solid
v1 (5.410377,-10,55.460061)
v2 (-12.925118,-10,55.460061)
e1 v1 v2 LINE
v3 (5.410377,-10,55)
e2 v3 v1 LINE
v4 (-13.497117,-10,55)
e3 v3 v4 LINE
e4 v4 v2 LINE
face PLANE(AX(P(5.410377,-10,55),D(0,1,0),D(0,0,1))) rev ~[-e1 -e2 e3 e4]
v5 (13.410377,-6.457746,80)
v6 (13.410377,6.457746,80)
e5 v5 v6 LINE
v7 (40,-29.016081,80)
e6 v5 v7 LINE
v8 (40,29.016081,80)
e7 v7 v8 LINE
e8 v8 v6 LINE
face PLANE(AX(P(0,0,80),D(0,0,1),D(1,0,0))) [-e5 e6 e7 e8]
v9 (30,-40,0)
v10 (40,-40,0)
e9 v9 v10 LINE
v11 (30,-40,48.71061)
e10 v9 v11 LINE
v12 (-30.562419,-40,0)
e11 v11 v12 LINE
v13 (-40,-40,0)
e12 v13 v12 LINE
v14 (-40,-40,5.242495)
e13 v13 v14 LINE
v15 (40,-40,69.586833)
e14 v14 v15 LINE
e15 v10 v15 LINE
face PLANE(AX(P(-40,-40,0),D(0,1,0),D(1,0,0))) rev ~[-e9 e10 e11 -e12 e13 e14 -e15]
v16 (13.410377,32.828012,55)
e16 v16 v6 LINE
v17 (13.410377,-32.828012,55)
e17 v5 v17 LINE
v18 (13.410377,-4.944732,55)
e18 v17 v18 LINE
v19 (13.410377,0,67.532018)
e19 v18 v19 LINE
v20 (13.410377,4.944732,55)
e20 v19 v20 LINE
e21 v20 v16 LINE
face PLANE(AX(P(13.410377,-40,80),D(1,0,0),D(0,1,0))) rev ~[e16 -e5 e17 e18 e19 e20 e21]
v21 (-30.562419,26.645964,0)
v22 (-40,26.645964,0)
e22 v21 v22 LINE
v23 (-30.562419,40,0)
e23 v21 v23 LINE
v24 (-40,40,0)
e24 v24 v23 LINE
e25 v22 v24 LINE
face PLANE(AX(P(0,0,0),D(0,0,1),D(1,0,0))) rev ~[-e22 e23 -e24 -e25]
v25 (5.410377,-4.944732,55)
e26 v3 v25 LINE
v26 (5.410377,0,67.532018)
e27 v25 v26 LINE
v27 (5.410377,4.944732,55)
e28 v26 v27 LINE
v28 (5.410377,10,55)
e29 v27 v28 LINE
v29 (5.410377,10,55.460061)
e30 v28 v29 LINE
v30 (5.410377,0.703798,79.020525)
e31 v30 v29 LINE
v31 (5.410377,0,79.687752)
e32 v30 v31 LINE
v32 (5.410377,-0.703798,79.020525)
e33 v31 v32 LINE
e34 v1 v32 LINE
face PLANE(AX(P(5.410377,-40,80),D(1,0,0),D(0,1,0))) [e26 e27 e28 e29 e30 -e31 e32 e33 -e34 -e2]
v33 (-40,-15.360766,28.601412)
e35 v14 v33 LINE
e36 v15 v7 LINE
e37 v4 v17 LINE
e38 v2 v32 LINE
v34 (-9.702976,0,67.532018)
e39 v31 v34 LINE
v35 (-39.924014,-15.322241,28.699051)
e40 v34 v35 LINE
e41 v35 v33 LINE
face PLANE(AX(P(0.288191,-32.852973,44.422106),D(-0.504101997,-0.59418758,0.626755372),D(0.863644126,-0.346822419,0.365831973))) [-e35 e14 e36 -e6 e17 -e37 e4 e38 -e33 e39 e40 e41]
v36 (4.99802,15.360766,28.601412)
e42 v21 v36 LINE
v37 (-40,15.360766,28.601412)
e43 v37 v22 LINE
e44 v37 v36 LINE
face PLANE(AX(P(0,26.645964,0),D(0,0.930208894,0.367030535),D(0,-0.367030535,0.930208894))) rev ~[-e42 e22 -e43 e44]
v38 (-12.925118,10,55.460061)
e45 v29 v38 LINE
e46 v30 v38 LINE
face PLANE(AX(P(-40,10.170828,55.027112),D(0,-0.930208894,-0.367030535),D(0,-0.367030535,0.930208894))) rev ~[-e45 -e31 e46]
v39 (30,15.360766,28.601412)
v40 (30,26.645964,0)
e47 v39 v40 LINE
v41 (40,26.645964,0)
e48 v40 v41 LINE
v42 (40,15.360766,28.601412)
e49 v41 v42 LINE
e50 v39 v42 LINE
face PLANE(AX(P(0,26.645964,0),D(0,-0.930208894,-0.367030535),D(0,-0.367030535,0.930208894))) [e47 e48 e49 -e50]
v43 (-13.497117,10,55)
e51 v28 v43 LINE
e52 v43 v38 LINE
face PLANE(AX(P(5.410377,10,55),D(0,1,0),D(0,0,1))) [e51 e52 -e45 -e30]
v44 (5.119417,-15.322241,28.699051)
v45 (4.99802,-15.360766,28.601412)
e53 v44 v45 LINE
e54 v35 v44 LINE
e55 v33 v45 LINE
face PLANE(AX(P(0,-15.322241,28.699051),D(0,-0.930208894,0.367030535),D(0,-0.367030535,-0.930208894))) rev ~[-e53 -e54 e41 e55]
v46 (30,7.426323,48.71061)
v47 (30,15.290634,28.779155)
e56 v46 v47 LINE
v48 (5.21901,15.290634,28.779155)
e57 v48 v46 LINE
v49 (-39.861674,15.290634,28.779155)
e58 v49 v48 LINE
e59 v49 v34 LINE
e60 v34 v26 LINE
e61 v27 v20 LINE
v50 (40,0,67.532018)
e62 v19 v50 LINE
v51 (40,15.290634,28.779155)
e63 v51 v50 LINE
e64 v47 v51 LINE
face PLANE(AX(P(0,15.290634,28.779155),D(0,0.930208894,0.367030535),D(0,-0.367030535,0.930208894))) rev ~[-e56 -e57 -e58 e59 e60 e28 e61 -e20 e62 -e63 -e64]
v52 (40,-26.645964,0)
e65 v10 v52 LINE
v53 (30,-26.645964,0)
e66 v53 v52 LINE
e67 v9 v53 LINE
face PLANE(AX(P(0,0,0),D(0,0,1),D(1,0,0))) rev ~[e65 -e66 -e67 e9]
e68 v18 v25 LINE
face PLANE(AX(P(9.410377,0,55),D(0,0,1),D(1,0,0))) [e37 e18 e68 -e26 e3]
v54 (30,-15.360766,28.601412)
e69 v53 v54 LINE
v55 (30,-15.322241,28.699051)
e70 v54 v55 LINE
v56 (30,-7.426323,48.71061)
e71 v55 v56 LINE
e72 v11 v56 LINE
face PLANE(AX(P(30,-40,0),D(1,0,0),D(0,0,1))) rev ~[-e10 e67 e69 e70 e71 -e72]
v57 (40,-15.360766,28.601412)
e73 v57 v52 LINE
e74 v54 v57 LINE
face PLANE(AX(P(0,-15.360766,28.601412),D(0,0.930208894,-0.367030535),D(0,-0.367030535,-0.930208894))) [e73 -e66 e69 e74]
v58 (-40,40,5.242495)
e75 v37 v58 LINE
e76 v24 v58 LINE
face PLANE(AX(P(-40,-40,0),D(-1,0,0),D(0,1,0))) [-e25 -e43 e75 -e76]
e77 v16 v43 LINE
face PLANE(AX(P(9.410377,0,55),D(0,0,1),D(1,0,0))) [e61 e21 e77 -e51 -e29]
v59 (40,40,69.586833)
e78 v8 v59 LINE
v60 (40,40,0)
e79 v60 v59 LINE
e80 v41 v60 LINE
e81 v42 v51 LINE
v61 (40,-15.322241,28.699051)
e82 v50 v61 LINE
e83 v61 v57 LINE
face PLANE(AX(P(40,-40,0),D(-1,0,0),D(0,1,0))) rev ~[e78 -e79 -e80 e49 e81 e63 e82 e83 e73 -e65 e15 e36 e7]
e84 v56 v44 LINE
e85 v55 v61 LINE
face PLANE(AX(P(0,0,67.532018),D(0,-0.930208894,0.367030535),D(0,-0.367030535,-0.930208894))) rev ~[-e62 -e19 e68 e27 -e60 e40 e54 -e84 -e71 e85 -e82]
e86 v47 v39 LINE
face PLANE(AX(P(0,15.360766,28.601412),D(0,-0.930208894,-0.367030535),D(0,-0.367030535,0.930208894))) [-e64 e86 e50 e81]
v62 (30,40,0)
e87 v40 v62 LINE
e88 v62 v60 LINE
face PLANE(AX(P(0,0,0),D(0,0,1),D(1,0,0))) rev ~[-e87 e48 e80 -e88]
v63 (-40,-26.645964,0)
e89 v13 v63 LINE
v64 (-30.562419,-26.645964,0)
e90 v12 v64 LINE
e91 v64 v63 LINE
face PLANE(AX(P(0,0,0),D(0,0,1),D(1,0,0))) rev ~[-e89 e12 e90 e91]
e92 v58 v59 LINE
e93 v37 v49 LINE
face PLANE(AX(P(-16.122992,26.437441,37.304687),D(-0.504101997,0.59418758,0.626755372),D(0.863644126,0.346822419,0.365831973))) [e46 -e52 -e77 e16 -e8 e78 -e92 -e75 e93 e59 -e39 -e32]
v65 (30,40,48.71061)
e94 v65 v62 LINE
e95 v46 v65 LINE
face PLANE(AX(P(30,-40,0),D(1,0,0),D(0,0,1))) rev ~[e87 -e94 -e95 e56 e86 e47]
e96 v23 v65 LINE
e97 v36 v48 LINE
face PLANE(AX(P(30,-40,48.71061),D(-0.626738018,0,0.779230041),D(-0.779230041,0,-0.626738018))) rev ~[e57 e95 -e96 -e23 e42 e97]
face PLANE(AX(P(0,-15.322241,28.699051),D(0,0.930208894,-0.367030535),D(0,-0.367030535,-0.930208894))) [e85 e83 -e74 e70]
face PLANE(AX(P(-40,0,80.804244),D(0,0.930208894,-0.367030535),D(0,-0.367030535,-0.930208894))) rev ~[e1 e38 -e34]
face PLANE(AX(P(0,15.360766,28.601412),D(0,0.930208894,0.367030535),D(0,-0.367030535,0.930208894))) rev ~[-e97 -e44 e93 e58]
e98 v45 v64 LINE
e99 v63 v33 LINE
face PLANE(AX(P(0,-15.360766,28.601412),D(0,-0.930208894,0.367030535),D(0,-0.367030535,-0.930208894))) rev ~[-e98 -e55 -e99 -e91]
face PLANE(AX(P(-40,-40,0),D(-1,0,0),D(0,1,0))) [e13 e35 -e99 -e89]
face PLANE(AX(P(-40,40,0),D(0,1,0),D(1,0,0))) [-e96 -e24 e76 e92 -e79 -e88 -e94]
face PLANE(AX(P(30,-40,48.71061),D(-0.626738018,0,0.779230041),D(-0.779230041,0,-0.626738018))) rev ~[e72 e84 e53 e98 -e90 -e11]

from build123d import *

# Parameters (mm, degrees)
F0_W           = 80
F0_H           = 80
F1_DEPTH       = 80
F3_DEPTH       = 86.9
F4_W           = 8
F4_H           = 80
F5_DEPTH       = 25
F6_W           = 30
F6_H           = 25
F7_DEPTH       = 25
F9_DEPTH       = 50.3
F11_W          = 223.7579002976
F11_H          = 231.868326664
F12_DEPTH      = 25
F13_W          = 207.2095647454
F13_H          = 262.1310725808
F14_DEPTH      = 25
F16_DEPTH      = 127.5
F18_DEPTH      = 40.001
F18_DEPTH_BACK = 40.001


# Not quite as in the source:
# - a feature of the source that left no trace in its solid (it failed there, or was rolled back) is left out


with BuildPart() as f1:
    # F0 (on Top) → F1 (new body)
    with BuildSketch(Plane.XY):
        Rectangle(F0_W, F0_H)
    extrude(amount=F1_DEPTH)

    # F2 (on face) → F3 (cut)
    with BuildSketch(Plane.XZ.offset(40)):
        Polygon((-40, 28.6014117301), (0, 80), (-40, 80), align=None)
    extrude(amount=-F3_DEPTH, mode=Mode.SUBTRACT)

    # F4 (on face) → F5 (cut)
    with BuildSketch(Plane.XY.offset(80)):
        with Locations((9.4103766605, 0)):
            Rectangle(F4_W, F4_H)
    extrude(amount=-F5_DEPTH, mode=Mode.SUBTRACT)

    # F6 (on face) → F7 (cut)
    with BuildSketch(Plane.YZ.offset(5.4103766605)):
        with Locations((-25, 67.5)):
            Rectangle(F6_W, F6_H)
        with Locations((25, 67.5)):
            Rectangle(F6_W, F6_H)
    extrude(amount=-F7_DEPTH, mode=Mode.SUBTRACT)

    # F8 (on face) → F9 (cut)
    with BuildSketch(Plane(origin=(-40, 0, 0), x_dir=(0, -1, 0), z_dir=(-1, 0, 0))):
        Polygon((-10.1708276197, 55.0271123648), (0, 80.8042436838), (10.1708276197, 55.0271123648), (61.0520653427, 55.0271123648), (61.0520653427, 88.9606252313), (0, 88.9606252313), (-61.0520653427, 88.9606252313), (-61.0520653427, 55.0271123648), align=None)
    extrude(amount=-F9_DEPTH, mode=Mode.SUBTRACT)

    # F11 (on face) → F12 (cut)
    with BuildSketch(Plane(origin=(-23.8023577799, -28.0559598365, 29.5937245096), x_dir=(0.8636441264, -0.3468224195, 0.3658319728), z_dir=(-0.5041019966, -0.5941875801, 0.6267553723))):
        with Locations((27.8940685093, 6.7206919193)):
            Rectangle(F11_W, F11_H)
    extrude(amount=F12_DEPTH, mode=Mode.SUBTRACT)

    # F13 (on face) → F14 (cut)
    with BuildSketch(Plane(origin=(-23.8023577799, 28.0559598365, 29.5937245096), x_dir=(0.8636441264, 0.3468224195, 0.3658319728), z_dir=(-0.5041019966, 0.5941875801, 0.6267553723))):
        with Locations((8.8918171823, -6.4797215164)):
            Rectangle(F13_W, F13_H)
    extrude(amount=F14_DEPTH, mode=Mode.SUBTRACT)

    # F15 (on face) → F16 (cut)
    with BuildSketch(Plane.XZ.offset(40)):
        Polygon((30, 0), (30, 48.7106099482), (-30.5624192708, 0), align=None)
    extrude(amount=-F16_DEPTH, mode=Mode.SUBTRACT)

    # F17 (on Right) → F18 (cut, two sides)
    with BuildSketch(Plane.YZ) as f18_sk:
        Polygon((15.2906342708, 28.7791552365), (0, 67.5320180601), (-15.3222406511, 28.6990514489), (-15.3607661463, 28.6014117301), (15.3607661463, 28.6014117301), align=None)
        Polygon((26.6459640524, 0), (15.3607661463, 28.6014117301), (-15.3607661463, 28.6014117301), (-26.6459640524, 0), align=None)
    extrude(amount=-F18_DEPTH, mode=Mode.SUBTRACT)
    extrude(f18_sk.sketch, amount=F18_DEPTH_BACK, mode=Mode.SUBTRACT)


solid = f1.part
